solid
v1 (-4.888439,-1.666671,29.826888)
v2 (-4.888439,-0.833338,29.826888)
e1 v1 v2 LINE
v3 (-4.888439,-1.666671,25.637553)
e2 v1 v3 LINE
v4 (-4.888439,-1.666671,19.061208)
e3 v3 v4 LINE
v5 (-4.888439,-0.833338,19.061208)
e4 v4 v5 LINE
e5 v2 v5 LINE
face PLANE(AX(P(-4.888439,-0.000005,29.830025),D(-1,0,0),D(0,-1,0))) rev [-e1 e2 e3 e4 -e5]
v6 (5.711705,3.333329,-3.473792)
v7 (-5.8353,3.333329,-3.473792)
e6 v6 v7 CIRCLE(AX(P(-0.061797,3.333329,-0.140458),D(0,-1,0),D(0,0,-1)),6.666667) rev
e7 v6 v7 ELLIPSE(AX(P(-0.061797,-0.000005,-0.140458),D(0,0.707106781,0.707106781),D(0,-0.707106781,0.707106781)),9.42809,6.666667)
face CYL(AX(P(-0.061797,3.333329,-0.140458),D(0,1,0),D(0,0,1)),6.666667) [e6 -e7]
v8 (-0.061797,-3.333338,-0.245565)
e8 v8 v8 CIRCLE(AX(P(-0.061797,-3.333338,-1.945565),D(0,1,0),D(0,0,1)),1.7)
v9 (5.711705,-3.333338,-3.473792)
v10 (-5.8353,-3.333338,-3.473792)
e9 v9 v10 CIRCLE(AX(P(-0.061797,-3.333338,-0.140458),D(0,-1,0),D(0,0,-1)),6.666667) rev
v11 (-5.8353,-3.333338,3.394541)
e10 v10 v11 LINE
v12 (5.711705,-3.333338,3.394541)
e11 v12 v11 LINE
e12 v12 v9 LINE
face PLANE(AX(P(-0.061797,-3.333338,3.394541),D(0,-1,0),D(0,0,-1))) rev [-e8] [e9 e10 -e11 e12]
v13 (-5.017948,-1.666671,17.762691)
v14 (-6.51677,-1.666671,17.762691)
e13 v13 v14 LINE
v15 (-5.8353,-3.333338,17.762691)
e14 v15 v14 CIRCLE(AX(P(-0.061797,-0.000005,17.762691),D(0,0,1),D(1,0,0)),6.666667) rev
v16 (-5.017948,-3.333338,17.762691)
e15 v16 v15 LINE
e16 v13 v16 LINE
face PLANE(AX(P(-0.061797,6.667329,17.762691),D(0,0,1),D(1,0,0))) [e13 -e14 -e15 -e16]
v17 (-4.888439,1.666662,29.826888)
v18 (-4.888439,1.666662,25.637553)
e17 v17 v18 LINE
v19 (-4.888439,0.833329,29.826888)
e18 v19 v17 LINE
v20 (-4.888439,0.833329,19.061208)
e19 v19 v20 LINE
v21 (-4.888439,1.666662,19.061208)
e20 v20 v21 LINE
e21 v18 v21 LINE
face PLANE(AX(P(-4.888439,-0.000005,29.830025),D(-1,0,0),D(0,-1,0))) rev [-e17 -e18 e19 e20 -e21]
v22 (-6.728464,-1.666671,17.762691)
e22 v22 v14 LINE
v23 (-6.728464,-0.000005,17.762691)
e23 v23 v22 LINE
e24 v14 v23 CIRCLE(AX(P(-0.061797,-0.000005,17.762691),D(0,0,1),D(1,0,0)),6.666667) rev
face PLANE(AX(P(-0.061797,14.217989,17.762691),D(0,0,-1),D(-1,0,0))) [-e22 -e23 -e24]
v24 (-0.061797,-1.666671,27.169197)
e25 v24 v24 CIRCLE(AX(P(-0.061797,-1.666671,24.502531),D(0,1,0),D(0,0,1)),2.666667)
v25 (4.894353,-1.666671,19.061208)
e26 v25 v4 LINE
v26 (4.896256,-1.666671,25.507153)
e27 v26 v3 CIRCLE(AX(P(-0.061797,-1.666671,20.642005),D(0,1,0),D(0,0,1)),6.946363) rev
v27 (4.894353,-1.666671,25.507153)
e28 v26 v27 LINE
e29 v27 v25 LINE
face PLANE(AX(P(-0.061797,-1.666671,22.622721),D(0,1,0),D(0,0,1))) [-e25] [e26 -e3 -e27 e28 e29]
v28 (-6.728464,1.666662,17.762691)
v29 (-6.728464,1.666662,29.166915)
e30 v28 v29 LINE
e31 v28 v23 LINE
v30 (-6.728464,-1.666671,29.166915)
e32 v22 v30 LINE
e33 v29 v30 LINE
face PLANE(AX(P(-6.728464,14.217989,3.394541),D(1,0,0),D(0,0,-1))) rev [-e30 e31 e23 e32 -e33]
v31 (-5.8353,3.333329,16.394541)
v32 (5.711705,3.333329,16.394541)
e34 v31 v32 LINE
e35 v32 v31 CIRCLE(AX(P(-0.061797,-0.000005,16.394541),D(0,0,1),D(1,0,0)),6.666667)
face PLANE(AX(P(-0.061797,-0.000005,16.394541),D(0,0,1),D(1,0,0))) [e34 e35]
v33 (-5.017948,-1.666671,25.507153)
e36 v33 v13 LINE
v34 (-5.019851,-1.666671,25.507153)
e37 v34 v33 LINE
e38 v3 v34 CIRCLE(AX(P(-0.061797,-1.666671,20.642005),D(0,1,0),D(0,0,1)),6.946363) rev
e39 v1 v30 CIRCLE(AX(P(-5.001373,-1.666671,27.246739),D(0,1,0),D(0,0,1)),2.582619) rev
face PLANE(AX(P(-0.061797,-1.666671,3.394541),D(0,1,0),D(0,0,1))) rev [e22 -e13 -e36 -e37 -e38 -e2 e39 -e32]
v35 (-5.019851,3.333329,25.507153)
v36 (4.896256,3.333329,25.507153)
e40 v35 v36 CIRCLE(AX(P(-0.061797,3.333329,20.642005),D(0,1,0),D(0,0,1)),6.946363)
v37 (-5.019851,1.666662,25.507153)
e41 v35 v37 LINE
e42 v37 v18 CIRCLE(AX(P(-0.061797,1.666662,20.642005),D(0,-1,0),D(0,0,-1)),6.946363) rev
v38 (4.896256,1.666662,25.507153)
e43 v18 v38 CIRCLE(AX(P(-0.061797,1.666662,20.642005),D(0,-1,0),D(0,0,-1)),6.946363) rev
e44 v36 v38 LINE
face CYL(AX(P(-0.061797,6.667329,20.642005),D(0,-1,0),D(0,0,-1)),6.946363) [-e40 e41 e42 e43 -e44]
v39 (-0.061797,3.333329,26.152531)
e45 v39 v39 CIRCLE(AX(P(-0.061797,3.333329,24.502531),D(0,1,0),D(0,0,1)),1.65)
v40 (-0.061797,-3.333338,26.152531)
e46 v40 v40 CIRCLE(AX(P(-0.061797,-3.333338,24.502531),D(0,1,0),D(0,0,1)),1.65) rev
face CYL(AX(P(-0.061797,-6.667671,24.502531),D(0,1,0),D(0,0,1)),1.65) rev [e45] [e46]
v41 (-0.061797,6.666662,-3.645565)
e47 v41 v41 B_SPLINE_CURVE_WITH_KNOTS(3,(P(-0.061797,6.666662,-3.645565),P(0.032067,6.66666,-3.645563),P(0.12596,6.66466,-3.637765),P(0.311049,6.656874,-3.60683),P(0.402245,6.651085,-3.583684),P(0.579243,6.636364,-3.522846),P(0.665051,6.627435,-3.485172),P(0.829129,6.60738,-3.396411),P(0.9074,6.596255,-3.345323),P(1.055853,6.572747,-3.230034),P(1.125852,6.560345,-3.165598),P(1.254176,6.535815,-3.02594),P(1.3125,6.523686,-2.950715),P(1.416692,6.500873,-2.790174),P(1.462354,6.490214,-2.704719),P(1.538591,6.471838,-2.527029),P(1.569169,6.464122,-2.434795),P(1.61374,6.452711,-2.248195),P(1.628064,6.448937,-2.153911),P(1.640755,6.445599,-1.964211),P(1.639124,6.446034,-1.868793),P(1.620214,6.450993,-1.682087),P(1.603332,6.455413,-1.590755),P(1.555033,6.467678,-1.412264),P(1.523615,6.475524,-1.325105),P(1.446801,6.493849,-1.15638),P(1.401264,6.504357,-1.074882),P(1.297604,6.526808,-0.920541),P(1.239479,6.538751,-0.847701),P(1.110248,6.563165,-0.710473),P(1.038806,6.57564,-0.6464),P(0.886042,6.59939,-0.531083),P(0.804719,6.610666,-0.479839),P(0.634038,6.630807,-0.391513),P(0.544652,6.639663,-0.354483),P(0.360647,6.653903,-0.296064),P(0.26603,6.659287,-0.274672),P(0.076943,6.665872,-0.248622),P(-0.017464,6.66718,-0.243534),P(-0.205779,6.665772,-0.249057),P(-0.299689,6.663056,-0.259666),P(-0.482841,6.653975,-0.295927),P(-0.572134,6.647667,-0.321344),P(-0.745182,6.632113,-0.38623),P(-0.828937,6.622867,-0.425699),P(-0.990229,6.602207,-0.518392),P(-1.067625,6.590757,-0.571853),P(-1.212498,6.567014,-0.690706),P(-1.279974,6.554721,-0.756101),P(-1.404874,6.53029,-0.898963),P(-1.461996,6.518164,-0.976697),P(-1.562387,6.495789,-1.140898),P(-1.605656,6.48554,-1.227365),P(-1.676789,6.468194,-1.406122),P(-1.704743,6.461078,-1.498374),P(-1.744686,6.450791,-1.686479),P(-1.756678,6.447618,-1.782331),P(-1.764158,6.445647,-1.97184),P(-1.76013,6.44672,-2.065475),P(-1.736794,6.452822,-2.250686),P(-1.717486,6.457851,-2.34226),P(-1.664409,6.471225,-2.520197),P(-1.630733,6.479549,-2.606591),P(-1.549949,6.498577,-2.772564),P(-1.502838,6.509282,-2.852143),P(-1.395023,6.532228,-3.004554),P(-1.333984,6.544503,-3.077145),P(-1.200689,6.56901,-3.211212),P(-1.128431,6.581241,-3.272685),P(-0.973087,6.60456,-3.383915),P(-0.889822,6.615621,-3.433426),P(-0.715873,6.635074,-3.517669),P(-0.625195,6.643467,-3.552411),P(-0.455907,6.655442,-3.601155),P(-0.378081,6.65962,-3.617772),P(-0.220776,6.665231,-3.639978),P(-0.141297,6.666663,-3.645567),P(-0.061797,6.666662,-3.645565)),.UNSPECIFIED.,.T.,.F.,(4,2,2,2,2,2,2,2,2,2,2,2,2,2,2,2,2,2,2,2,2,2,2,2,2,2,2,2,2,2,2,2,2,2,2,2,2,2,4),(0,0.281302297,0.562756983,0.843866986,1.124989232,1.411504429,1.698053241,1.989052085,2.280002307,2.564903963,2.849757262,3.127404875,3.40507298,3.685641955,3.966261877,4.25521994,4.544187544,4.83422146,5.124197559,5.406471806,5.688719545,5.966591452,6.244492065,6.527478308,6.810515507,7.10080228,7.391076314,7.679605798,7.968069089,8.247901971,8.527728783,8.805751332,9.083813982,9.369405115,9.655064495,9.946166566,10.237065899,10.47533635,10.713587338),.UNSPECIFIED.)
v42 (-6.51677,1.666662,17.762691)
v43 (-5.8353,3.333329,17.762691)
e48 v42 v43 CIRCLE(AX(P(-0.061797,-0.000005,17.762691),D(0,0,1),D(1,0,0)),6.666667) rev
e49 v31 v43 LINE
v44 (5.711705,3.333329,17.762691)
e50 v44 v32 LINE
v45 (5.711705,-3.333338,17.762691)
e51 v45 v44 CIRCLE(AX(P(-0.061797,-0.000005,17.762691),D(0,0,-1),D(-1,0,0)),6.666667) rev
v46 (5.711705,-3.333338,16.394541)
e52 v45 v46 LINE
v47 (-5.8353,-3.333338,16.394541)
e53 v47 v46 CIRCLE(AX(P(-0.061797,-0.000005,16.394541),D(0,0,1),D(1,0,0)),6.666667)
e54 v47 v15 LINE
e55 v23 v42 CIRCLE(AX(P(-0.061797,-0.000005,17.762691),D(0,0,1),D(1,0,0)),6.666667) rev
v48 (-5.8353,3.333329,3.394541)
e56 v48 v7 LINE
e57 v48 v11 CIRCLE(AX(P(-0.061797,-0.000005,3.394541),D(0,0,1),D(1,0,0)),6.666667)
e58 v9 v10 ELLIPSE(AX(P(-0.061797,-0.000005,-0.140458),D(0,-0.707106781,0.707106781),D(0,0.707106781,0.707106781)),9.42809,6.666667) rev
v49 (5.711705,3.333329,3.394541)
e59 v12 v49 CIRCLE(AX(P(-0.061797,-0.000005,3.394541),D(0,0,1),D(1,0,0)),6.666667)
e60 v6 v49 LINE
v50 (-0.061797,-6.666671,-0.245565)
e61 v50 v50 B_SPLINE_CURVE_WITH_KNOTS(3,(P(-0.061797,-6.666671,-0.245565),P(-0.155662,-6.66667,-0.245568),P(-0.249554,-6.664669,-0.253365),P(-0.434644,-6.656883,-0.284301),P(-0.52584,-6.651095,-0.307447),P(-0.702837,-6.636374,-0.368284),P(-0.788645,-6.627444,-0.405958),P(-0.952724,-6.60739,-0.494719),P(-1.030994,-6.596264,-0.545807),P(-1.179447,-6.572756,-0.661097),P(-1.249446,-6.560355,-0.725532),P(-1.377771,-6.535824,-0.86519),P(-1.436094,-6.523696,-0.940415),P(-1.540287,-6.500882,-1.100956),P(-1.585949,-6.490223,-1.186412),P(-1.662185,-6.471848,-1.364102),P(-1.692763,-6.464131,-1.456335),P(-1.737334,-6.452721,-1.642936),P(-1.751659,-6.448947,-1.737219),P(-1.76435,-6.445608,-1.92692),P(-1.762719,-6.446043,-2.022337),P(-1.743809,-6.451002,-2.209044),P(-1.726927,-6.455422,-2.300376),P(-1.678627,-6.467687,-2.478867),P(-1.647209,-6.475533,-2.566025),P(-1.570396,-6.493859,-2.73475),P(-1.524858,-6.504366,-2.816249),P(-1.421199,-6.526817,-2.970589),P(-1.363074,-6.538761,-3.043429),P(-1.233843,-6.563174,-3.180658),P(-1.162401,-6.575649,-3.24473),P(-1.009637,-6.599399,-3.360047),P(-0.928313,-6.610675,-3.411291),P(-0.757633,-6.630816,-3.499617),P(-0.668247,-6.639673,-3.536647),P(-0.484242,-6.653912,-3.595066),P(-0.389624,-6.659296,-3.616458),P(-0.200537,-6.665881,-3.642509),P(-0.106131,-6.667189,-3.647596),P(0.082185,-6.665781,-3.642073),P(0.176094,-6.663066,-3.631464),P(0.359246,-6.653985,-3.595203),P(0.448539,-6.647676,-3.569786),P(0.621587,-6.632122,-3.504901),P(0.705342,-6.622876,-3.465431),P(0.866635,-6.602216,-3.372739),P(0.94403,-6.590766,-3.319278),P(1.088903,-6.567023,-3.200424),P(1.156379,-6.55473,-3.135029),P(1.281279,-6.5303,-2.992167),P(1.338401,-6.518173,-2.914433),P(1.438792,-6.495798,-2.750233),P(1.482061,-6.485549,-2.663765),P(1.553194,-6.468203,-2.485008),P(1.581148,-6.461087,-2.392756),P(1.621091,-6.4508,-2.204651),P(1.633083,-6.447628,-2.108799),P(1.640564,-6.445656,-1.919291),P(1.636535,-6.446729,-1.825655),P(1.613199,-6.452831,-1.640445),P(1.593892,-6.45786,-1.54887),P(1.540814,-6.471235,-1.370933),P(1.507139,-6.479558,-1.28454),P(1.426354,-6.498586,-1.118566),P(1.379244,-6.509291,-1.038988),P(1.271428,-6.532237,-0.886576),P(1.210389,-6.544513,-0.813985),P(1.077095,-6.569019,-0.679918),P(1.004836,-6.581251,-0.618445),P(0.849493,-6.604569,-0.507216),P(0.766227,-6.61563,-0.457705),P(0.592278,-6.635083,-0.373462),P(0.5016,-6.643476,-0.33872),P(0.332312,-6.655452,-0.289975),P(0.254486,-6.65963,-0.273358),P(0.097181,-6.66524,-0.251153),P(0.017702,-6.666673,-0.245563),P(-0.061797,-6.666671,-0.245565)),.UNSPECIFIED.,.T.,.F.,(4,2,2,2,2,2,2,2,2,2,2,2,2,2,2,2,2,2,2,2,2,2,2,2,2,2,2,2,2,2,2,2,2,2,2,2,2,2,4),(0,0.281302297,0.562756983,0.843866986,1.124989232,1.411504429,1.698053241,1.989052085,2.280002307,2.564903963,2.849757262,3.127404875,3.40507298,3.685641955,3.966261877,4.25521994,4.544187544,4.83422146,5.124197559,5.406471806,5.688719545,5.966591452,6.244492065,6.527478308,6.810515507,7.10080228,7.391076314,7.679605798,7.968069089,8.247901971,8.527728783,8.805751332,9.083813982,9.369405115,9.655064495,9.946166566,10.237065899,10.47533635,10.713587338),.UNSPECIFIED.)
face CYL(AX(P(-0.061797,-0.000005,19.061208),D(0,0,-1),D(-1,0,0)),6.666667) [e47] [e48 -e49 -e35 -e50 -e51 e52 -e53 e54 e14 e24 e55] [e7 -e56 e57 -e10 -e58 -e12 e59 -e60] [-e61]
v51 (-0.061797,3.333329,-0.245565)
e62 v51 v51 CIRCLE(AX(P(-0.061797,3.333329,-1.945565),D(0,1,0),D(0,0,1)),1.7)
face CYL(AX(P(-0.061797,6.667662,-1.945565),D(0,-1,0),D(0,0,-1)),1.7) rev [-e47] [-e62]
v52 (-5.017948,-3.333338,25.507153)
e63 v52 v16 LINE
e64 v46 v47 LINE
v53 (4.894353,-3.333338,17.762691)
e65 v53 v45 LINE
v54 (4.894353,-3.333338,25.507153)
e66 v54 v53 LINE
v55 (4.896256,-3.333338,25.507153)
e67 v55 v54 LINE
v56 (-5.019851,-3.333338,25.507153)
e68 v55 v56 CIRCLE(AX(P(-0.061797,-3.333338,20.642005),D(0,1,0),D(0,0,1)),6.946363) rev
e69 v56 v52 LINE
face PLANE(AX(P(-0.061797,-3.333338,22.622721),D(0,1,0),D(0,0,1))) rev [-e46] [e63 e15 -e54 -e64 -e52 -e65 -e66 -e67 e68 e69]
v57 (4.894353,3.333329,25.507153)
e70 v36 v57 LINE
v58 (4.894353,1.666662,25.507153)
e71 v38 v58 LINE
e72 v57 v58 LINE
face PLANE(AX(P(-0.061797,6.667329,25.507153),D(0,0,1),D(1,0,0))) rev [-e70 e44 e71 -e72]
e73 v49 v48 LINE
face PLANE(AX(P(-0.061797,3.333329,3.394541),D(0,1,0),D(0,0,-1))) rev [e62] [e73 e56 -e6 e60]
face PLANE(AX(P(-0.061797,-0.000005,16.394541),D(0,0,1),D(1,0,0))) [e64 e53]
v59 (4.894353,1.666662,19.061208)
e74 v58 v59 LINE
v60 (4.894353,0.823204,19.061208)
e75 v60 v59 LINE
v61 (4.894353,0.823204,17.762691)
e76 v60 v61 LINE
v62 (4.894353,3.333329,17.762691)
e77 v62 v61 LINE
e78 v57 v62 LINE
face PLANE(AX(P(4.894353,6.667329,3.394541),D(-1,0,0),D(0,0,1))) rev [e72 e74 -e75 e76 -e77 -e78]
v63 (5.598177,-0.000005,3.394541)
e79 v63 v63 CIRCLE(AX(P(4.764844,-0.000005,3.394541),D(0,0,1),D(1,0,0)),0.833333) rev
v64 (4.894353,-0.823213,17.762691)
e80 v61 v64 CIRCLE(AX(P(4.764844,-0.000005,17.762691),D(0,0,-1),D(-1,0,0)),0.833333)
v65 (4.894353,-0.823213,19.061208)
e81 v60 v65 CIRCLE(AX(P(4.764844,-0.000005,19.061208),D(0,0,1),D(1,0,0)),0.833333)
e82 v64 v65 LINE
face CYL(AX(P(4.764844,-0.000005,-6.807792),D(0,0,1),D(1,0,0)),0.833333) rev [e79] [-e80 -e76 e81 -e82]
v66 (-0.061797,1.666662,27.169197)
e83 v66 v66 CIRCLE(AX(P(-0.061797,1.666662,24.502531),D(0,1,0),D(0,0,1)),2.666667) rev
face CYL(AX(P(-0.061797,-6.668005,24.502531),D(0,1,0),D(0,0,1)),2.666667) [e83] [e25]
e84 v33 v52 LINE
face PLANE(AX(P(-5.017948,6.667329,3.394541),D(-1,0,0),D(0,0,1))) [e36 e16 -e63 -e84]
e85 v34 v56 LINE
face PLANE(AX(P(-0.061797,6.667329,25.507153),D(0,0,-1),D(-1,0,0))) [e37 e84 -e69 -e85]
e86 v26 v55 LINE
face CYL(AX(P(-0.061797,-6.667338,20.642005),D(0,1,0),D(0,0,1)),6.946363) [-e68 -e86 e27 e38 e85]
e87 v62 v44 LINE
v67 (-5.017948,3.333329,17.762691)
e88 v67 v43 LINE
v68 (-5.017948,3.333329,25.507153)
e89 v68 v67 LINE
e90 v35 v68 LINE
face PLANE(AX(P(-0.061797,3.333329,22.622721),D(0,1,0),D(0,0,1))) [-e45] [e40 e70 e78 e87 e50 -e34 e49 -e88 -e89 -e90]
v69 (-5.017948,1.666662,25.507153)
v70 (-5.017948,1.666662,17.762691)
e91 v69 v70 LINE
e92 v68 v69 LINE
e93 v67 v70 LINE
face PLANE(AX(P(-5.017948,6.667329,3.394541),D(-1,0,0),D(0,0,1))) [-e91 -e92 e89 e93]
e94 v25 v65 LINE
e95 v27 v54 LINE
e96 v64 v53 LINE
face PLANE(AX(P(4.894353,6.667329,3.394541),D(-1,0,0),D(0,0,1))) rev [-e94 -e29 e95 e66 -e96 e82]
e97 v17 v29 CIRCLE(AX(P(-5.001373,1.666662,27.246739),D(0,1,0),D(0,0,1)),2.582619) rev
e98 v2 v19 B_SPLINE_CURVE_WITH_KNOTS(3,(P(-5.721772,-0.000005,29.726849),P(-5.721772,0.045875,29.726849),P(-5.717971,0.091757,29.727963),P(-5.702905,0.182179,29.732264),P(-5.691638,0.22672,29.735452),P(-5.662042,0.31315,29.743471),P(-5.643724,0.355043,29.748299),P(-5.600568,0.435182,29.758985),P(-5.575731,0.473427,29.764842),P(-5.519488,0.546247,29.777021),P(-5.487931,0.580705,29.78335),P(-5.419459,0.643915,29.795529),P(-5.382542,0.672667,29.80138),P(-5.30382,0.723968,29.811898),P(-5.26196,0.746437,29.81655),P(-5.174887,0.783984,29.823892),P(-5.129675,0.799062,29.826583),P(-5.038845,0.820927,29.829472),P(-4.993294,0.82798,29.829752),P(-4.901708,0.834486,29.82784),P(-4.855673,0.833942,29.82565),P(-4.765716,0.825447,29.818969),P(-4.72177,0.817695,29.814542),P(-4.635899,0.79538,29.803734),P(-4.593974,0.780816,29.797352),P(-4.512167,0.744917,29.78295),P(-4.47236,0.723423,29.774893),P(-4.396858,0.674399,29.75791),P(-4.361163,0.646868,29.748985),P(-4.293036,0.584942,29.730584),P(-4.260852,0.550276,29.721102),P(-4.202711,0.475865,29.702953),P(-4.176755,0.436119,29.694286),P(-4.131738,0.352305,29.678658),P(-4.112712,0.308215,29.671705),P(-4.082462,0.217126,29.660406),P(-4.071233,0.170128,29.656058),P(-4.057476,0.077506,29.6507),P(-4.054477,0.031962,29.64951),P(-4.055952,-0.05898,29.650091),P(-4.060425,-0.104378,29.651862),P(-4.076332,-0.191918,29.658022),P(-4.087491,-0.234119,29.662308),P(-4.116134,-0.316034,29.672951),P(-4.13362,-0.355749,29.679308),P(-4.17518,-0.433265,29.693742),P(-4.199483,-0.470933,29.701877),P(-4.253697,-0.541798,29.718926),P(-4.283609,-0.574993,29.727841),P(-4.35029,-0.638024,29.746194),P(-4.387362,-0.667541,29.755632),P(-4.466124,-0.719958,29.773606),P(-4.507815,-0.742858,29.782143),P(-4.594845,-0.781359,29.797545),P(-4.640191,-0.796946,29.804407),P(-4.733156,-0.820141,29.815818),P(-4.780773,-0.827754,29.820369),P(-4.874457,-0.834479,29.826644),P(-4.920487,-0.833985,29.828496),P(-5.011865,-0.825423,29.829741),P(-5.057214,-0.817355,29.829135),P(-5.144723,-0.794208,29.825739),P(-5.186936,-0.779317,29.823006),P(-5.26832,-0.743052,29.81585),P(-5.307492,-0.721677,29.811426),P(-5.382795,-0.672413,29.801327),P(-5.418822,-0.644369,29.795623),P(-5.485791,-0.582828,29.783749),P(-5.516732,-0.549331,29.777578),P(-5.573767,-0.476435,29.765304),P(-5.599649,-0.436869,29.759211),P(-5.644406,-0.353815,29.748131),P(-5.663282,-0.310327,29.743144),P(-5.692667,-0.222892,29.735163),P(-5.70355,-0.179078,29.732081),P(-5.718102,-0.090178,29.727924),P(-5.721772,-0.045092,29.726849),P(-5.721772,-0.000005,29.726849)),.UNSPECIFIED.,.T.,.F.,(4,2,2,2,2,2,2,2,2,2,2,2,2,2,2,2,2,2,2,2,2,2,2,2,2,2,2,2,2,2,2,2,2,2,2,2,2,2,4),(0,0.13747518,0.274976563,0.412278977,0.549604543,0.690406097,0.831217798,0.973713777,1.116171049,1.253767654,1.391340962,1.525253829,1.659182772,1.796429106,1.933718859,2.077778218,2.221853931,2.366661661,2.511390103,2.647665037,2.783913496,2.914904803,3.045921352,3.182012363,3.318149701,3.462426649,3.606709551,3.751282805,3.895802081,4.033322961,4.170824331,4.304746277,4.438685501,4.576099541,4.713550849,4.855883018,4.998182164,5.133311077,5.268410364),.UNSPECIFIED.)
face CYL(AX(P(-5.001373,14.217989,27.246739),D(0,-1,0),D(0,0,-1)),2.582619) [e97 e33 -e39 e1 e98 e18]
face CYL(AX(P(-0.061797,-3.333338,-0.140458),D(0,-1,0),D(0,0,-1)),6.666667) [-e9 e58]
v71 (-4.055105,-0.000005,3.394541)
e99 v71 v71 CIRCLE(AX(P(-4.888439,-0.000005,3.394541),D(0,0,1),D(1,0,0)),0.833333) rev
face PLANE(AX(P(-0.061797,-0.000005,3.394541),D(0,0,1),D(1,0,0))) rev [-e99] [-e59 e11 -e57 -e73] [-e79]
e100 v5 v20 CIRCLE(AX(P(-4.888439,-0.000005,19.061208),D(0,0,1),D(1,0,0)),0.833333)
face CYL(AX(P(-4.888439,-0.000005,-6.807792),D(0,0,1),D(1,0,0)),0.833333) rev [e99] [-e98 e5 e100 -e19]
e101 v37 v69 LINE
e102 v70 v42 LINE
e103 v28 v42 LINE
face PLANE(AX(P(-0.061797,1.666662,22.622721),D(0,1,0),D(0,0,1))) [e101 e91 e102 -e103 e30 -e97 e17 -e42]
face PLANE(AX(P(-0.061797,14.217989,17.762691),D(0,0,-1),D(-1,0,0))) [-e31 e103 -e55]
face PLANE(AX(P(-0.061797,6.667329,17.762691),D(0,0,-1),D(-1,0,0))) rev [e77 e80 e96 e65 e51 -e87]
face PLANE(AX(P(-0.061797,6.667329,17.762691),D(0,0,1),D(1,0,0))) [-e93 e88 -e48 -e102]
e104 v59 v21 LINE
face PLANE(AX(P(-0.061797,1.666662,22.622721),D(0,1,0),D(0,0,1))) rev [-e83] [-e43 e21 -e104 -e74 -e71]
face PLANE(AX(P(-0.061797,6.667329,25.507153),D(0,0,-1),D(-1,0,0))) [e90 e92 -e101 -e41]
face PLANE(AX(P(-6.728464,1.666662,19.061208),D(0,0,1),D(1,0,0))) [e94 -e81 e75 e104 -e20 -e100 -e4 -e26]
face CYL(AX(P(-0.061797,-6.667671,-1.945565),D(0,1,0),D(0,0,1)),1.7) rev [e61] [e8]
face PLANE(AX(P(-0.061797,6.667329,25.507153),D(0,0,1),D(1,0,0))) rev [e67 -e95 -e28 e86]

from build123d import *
from build123d.topology import SkipClean

# Parameters (mm, degrees)
SKETCH2_R                       = 10
PHALANGE_LENGTH_DEPTH           = 23.5
BOSS_EXTRUDE3_DEPTH             = 5
BOSS_EXTRUDE4_DEPTH             = 5
BOSS_EXTRUDE4_DEPTH_BACK        = 5
CUT_EXTRUDE2_START              = -15.3025
CUT_EXTRUDE2_DEPTH              = 15.3025
SKETCH7_R                       = 1.65
CUT_EXTRUDE3_DEPTH              = 10
CUT_EXTRUDE4_DEPTH              = 2.5
CUT_EXTRUDE4_DEPTH_BACK         = 2.5
CUT_EXTRUDE7_REACH              = 44.831
SKETCH4_R                       = 1.65
CUT_EXTRUDE7_DIRECTION_2_REACH  = 44.831
CUT_EXTRUDE_THIN1_START         = 23.5
CUT_EXTRUDE_THIN1_DEPTH         = 10.361670454
BOSS_EXTRUDE5_REACH             = 44.021
SKETCH9_R                       = 4
SKETCH9_R_2                     = 1.65
CUT_EXTRUDE8_REACH              = 43.299
SKETCH10_R                      = 1.25
CUT_EXTRUDE9_START              = -4
CUT_EXTRUDE9_DEPTH              = 4
CUT_EXTRUDE10_REACH             = 44.021
CUT_EXTRUDE10_DIRECTION_2_REACH = 44.021
CUT_EXTRUDE11_START             = -10
CUT_EXTRUDE11_OUTLINE_W         = 2.565773848
CUT_EXTRUDE11_OUTLINE_H         = 11.6166929
CUT_EXTRUDE11_DEPTH             = 10
BOSS_EXTRUDE7_REACH             = 41.664
CUT_EXTRUDE12_REACH             = 43.299
SKETCH10_2_R                    = 1.25
CUT_EXTRUDE12_DIRECTION_2_REACH = 43.299
SKETCH17_R                      = 1.25
SKETCH17_W                      = 2.42123439
SKETCH17_H                      = 5
CUT_EXTRUDE14_DEPTH             = 16.148519
SCALE1_SCALE                    = 0.666666667
CUT_EXTRUDE15_START             = -10
SKETCH18_R                      = 1.65
CUT_EXTRUDE15_DEPTH             = 13.333338
CUT_EXTRUDE16_START             = -3.333333
SKETCH19_R                      = 1.7
CUT_EXTRUDE16_DEPTH             = 13.333338


# Read off the part's stored shape, not the designer's step: Cut-Extrude-Thin1, Cut-Extrude11
with BuildPart() as part:
    # Sketch2 → Phalange Length (new body)
    with BuildSketch(Plane.XY):
        Circle(SKETCH2_R)
    extrude(amount=PHALANGE_LENGTH_DEPTH)

    # Sketch3 → Boss-Extrude3 (add)
    with BuildSketch(Plane(origin=(0, -10, 0), x_dir=(-1, 0, 0), z_dir=(0, -1, 0))):
        with BuildLine():
            Line((-10, 5.302499701), (-10, 0))
            Line((-10, 0), (10, 0))
            Line((10, 0), (10, 5.302499701))
            ThreePointArc((10, 5.302499701), (0, 15.302499701), (-10, 5.302499701))
        make_face()
    boss_extrude3 = extrude(amount=-BOSS_EXTRUDE3_DEPTH)

    # Mirror1: Boss-Extrude3 across plane
    add(boss_extrude3.mirror(Plane.ZX))

    # Sketch5 → Boss-Extrude4 (add, two sides: drawn at the far end of the back side and taken through both)
    with BuildSketch(Plane(origin=(0, 0, 0), x_dir=(1, 0, 0), z_dir=(0, 1, 0)).offset(-BOSS_EXTRUDE4_DEPTH_BACK)):
        with BuildLine():
            Line((-10, -29.283157911), (-10, -23.5))
            Line((-10, -23.5), (10, -23.5))
            Line((10, -23.5), (10, -29.283157911))
            ThreePointArc((10, -29.283157911), (0, -38.851984156), (-10, -29.283157911))
        make_face()
    extrude(amount=BOSS_EXTRUDE4_DEPTH + BOSS_EXTRUDE4_DEPTH_BACK)

    # Sketch6 → Cut-Extrude2 (cut)
    with SkipClean():  # the faces are left unmerged after this step: merging them gives an invalid solid
        with BuildSketch(Plane.XY.offset(CUT_EXTRUDE2_START)):
            with BuildLine():
                ThreePointArc((0, 10), (5, 8.660254038), (8.660254038, 5))
                Line((8.660254038, 5), (10, 5))
                Line((10, 5), (10, 10))
                Line((10, 10), (0, 10))
            make_face()
            with BuildLine():
                Line((10, -5), (8.660254038, -5))
                ThreePointArc((8.660254038, -5), (5, -8.660254038), (0, -10))
                Line((0, -10), (10, -10))
                Line((10, -10), (10, -5))
            make_face()
            with BuildLine():
                ThreePointArc((-8.660254038, 5), (-5, 8.660254038), (0, 10))
                Line((0, 10), (-10, 10))
                Line((-10, 10), (-10, 5))
                Line((-10, 5), (-8.660254038, 5))
            make_face()
            with BuildLine():
                Line((-10, -10), (0, -10))
                ThreePointArc((0, -10), (-5, -8.660254038), (-8.660254038, -5))
                Line((-8.660254038, -5), (-10, -5))
                Line((-10, -5), (-10, -10))
            make_face()
        extrude(amount=CUT_EXTRUDE2_DEPTH, mode=Mode.SUBTRACT)

    # Sketch7 → Cut-Extrude3 (cut)
    with SkipClean():  # the faces are left unmerged after this step: merging them gives an invalid solid
        with BuildSketch(Plane(origin=(0, 5, 0), x_dir=(1, 0, 0), z_dir=(0, 1, 0))):
            with Locations(Location((0, -31.661984156, 0), (0, 0, 270))):
                Circle(SKETCH7_R)
        extrude(amount=-CUT_EXTRUDE3_DEPTH, mode=Mode.SUBTRACT)

    # Sketch5<2> → Cut-Extrude4 (cut, two sides: drawn at the far end of the back side and taken through both)
    with BuildSketch(Plane(origin=(0, 0, 0), x_dir=(1, 0, 0), z_dir=(0, 1, 0)).offset(-CUT_EXTRUDE4_DEPTH_BACK)):
        with BuildLine():
            Line((-10, -29.283157911), (-10, -23.5))
            Line((-10, -23.5), (10, -23.5))
            Line((10, -23.5), (10, -29.283157911))
            ThreePointArc((10, -29.283157911), (0, -38.851984156), (-10, -29.283157911))
        make_face()
    extrude(amount=CUT_EXTRUDE4_DEPTH + CUT_EXTRUDE4_DEPTH_BACK, mode=Mode.SUBTRACT)

    # Sketch4 → Cut-Extrude7 (cut, up to next)
    with BuildSketch(Plane(origin=(0, -5, 0), x_dir=(1, 0, 0), z_dir=(0, 1, 0)), mode=Mode.PRIVATE) as cut_extrude7_sk1:
        with Locations(Location((0, 8.010159673, 0), (0, 0, 270))):
            Circle(SKETCH4_R)
    cut_extrude7_tool1 = extrude(cut_extrude7_sk1.sketch, amount=-CUT_EXTRUDE7_REACH, mode=Mode.PRIVATE) & part.part
    add(cut_extrude7_tool1.solids().sort_by_distance((0, -5, -8.01016))[0], mode=Mode.SUBTRACT)

    # Sketch4 → Cut-Extrude7 direction 2 (cut, up to next)
    with BuildSketch(Plane(origin=(0, -5, 0), x_dir=(1, 0, 0), z_dir=(0, 1, 0)), mode=Mode.PRIVATE) as cut_extrude7_direction_2_sk1:
        with Locations(Location((0, 8.010159673, 0), (0, 0, 270))):
            Circle(SKETCH4_R)
    cut_extrude7_direction_2_tool1 = extrude(cut_extrude7_direction_2_sk1.sketch, amount=CUT_EXTRUDE7_DIRECTION_2_REACH, mode=Mode.PRIVATE) & part.part
    add(cut_extrude7_direction_2_tool1.solids().sort_by_distance((0, -5, -8.01016))[0], mode=Mode.SUBTRACT)

    # Cut-Extrude-Thin1 outline → Cut-Extrude-Thin1 (cut)
    with SkipClean():  # the faces are left unmerged after this step: merging them gives an invalid solid
        with BuildSketch(Plane.XY.offset(CUT_EXTRUDE_THIN1_START)):
            with BuildLine():
                ThreePointArc((8.660254038, 5), (9.256147934, 3.78466979), (9.682458366, 2.5))
                Line((9.682458366, 2.5), (10, 2.5))
                Line((10, 2.5), (10, 5))
                Line((10, 5), (8.660254038, 5))
            make_face()
            with BuildLine():
                Line((10, -2.5), (9.682458366, -2.5))
                ThreePointArc((9.682458366, -2.5), (9.256147934, -3.78466979), (8.660254038, -5))
                Line((8.660254038, -5), (10, -5))
                Line((10, -5), (10, -2.5))
            make_face()
            with BuildLine():
                Line((-10, 2.5), (-9.682458366, 2.5))
                ThreePointArc((-9.682458366, 2.5), (-9.256147934, 3.78466979), (-8.660254038, 5))
                Line((-8.660254038, 5), (-10, 5))
                Line((-10, 5), (-10, 2.5))
            make_face()
            with BuildLine():
                ThreePointArc((-8.660254038, -5), (-9.256147934, -3.78466979), (-9.682458366, -2.5))
                Line((-9.682458366, -2.5), (-10, -2.5))
                Line((-10, -2.5), (-10, -5))
                Line((-10, -5), (-8.660254038, -5))
            make_face()
        extrude(amount=CUT_EXTRUDE_THIN1_DEPTH, mode=Mode.SUBTRACT)

    # Sketch9 → Boss-Extrude5 (add, up to next)
    with BuildSketch(Plane.XZ.offset(-2.5), mode=Mode.PRIVATE) as boss_extrude5_sk1:
        with Locations(Location((0, 31.661984156, 0), (0, 0, 90))):
            Circle(SKETCH9_R)
        with Locations(Location((0, 31.661984156, 0), (0, 0, 90))):
            Circle(SKETCH9_R_2, mode=Mode.SUBTRACT)
    boss_extrude5_tool1 = extrude(boss_extrude5_sk1.sketch, amount=BOSS_EXTRUDE5_REACH, mode=Mode.PRIVATE) - part.part
    add(boss_extrude5_tool1.solids().sort_by_distance((0, 2.5, 27.775121))[0])

    # Sketch10 → Cut-Extrude8 (cut, up to next)
    with BuildSketch(Plane.XY.offset(23.5), mode=Mode.PRIVATE) as cut_extrude8_sk1:
        with Locations((7.239961745, 0)):
            Circle(SKETCH10_R)
    cut_extrude8_tool1 = extrude(cut_extrude8_sk1.sketch, amount=-CUT_EXTRUDE8_REACH, mode=Mode.PRIVATE) & part.part
    # Sketch10 → Cut-Extrude8 (cut, up to next)
    with BuildSketch(Plane.XY.offset(23.5), mode=Mode.PRIVATE) as cut_extrude8_sk2:
        with Locations((-7.239961745, 0)):
            Circle(SKETCH10_R)
    cut_extrude8_tool2 = extrude(cut_extrude8_sk2.sketch, amount=-CUT_EXTRUDE8_REACH, mode=Mode.PRIVATE) & part.part
    add(cut_extrude8_tool1.solids().sort_by_distance((7.239962, 0, 23.5))[0], mode=Mode.SUBTRACT)
    add(cut_extrude8_tool2.solids().sort_by_distance((-7.239962, 0, 23.5))[0], mode=Mode.SUBTRACT)

    # Sketch11 → Cut-Extrude9 (cut)
    with SkipClean():  # the faces are left unmerged after this step: merging them gives an invalid solid
        with BuildSketch(Plane.XY.offset(23.5).offset(CUT_EXTRUDE9_START)):
            with BuildLine():
                ThreePointArc((8.660254038, 5), (0, 10), (-8.660254038, 5))
                Line((-8.660254038, 5), (8.660254038, 5))
            make_face()
            with BuildLine():
                Line((8.660254038, -5), (-8.660254038, -5))
                ThreePointArc((-8.660254038, -5), (0, -10), (8.660254038, -5))
            make_face()
        extrude(amount=CUT_EXTRUDE9_DEPTH, mode=Mode.SUBTRACT)

    # Sketch12 → Cut-Extrude10 (cut, up to next)
    with BuildSketch(Plane.XZ.offset(-2.5), mode=Mode.PRIVATE) as cut_extrude10_sk1:
        with BuildLine():
            Line((-10.033719202, 38.851984156), (-10.033719202, 31.664892021))
            Line((-10.033719202, 31.664892021), (-8.660254038, 31.664892021))
            ThreePointArc((-8.660254038, 31.664892021), (0, 36.290740593), (8.660254038, 31.664892021))
            Line((8.660254038, 31.664892021), (10.033719202, 31.664892021))
            Line((10.033719202, 31.664892021), (10.033719202, 38.851984156))
            Line((10.033719202, 38.851984156), (-10.033719202, 38.851984156))
        make_face()
    cut_extrude10_tool1 = extrude(cut_extrude10_sk1.sketch, amount=CUT_EXTRUDE10_REACH, mode=Mode.PRIVATE) & part.part
    add(cut_extrude10_tool1.solids().sort_by_distance((0, 2.5, 36.350279))[0], mode=Mode.SUBTRACT)

    # Sketch12 → Cut-Extrude10 direction 2 (cut, up to next)
    with BuildSketch(Plane.XZ.offset(-2.5), mode=Mode.PRIVATE) as cut_extrude10_direction_2_sk1:
        with BuildLine():
            Line((-10.033719202, 38.851984156), (-10.033719202, 31.664892021))
            Line((-10.033719202, 31.664892021), (-8.660254038, 31.664892021))
            ThreePointArc((-8.660254038, 31.664892021), (0, 36.290740593), (8.660254038, 31.664892021))
            Line((8.660254038, 31.664892021), (10.033719202, 31.664892021))
            Line((10.033719202, 31.664892021), (10.033719202, 38.851984156))
            Line((10.033719202, 38.851984156), (-10.033719202, 38.851984156))
        make_face()
    cut_extrude10_direction_2_tool1 = extrude(cut_extrude10_direction_2_sk1.sketch, amount=-CUT_EXTRUDE10_DIRECTION_2_REACH, mode=Mode.PRIVATE) & part.part
    add(cut_extrude10_direction_2_tool1.solids().sort_by_distance((0, 2.5, 36.350279))[0], mode=Mode.SUBTRACT)

    # Cut-Extrude11 outline → Cut-Extrude11 (cut)
    with BuildSketch(Plane.XZ.offset(5).offset(CUT_EXTRUDE11_START)):
        with Locations((-8.717113076, 27.360571369)):
            Rectangle(CUT_EXTRUDE11_OUTLINE_W, CUT_EXTRUDE11_OUTLINE_H)
        with Locations((8.717113076, 27.360571369)):
            Rectangle(CUT_EXTRUDE11_OUTLINE_W, CUT_EXTRUDE11_OUTLINE_H)
    extrude(amount=CUT_EXTRUDE11_DEPTH, mode=Mode.SUBTRACT)

    # Boss-Extrude7: up to this face of the body (flat: up to its plane)
    boss_extrude7_end = Plane(part.part.faces().sort_by_distance((0, 2.5, 23.696174341))[0])
    # Sketch16 → Boss-Extrude7 (add, up to the picked face)
    with BuildSketch(Plane(origin=(0, -2.5, 0), x_dir=(1, 0, 0), z_dir=(0, 1, 0)), mode=Mode.PRIVATE) as boss_extrude7_sk1:
        with BuildLine():
            Line((-4.818727355, -21.552224919), (-7.434226152, -21.552224919))
            Line((-7.434226152, -21.552224919), (-10, -21.552224919))
            Line((-10, -21.552224919), (-10, -38.658561033))
            ThreePointArc((-10, -38.658561033), (-8.808295471, -39.390817912), (-7.43422564, -39.652145139))
            ThreePointArc((-7.43422564, -39.652145139), (-6.033645007, -39.399721533), (-4.818727355, -38.658561033))
            Line((-4.818727355, -38.658561033), (-4.818727355, -35.109527951))
            ThreePointArc((-4.818727355, -35.109527951), (-6.204248493, -34.242230104), (-7.437080645, -33.168917819))
            Line((-7.437080645, -33.168917819), (-7.434226152, -33.168917819))
            Line((-7.434226152, -33.168917819), (-7.434226152, -23.5))
            Line((-7.434226152, -23.5), (-4.818727355, -23.5))
            Line((-4.818727355, -23.5), (-4.818727355, -21.552224919))
        make_face()
    boss_extrude7_tool1 = split(extrude(boss_extrude7_sk1.sketch, amount=BOSS_EXTRUDE7_REACH, mode=Mode.PRIVATE), bisect_by=boss_extrude7_end, keep=Keep.BOTH, mode=Mode.PRIVATE)
    # Sketch16 → Boss-Extrude7 (add, up to the picked face)
    with BuildSketch(Plane(origin=(0, -2.5, 0), x_dir=(1, 0, 0), z_dir=(0, 1, 0)), mode=Mode.PRIVATE) as boss_extrude7_sk2:
        with BuildLine():
            Line((-4.818727355, -35.109527951), (-4.818727355, -23.5))
            Line((-4.818727355, -23.5), (-7.434226152, -23.5))
            Line((-7.434226152, -23.5), (-7.434226152, -33.168917819))
            Line((-7.434226152, -33.168917819), (-7.437080645, -33.168917819))
            ThreePointArc((-7.437080645, -33.168917819), (-6.204248493, -34.242230104), (-4.818727355, -35.109527951))
        make_face()
    boss_extrude7_tool2 = split(extrude(boss_extrude7_sk2.sketch, amount=BOSS_EXTRUDE7_REACH, mode=Mode.PRIVATE), bisect_by=boss_extrude7_end, keep=Keep.BOTH, mode=Mode.PRIVATE)
    add(boss_extrude7_tool1.solids().sort_by(Axis((-7.989429, -2.5, 31.133344), (0, 1, 0)))[0])
    add(boss_extrude7_tool2.solids().sort_by(Axis((-6.08748, -2.5, 28.8879), (0, 1, 0)))[0])

    # Sketch10<2> → Cut-Extrude12 (cut, up to next)
    with BuildSketch(Plane.XY.offset(23.5), mode=Mode.PRIVATE) as cut_extrude12_sk1:
        with Locations((-7.239961745, 0)):
            Circle(SKETCH10_2_R)
    cut_extrude12_tool1 = extrude(cut_extrude12_sk1.sketch, amount=CUT_EXTRUDE12_REACH, mode=Mode.PRIVATE) & part.part
    add(cut_extrude12_tool1.solids().sort_by_distance((-7.239962, 0, 23.5))[0], mode=Mode.SUBTRACT)

    # Sketch10<2> → Cut-Extrude12 direction 2 (cut, up to next)
    with BuildSketch(Plane.XY.offset(23.5), mode=Mode.PRIVATE) as cut_extrude12_direction_2_sk1:
        with Locations((-7.239961745, 0)):
            Circle(SKETCH10_2_R)
    cut_extrude12_direction_2_tool1 = extrude(cut_extrude12_direction_2_sk1.sketch, amount=-CUT_EXTRUDE12_DIRECTION_2_REACH, mode=Mode.PRIVATE) & part.part
    add(cut_extrude12_direction_2_tool1.solids().sort_by_distance((-7.239962, 0, 23.5))[0], mode=Mode.SUBTRACT)

    # Sketch17 → Cut-Extrude14 (cut)
    with SkipClean():  # the faces are left unmerged after this step: merging them gives an invalid solid
        with BuildSketch(Plane.XY.offset(23.5)):
            with Locations((-7.239961745, 0)):
                Circle(SKETCH17_R)
            with Locations((-6.02934455, 0)):
                Rectangle(SKETCH17_W, SKETCH17_H)
        extrude(amount=CUT_EXTRUDE14_DEPTH, mode=Mode.SUBTRACT)


with BuildPart() as part_1:
    # Scale1: scaled about (-0.185364754, -1.7e-07, 10.183125928)
    add(part.part.scale(SCALE1_SCALE).moved(Location((-0.061788251, -5.7e-08, 3.394375309))))

    # Sketch18 → Cut-Extrude15 (cut)
    with BuildSketch(Plane(origin=(0, 3.333328693, 0), x_dir=(1, 0, 0), z_dir=(0, 1, 0)).offset(CUT_EXTRUDE15_START)):
        with Locations(Location((-0.061797352, -24.502530762, 0), (0, 0, 270))):
            Circle(SKETCH18_R)
    extrude(amount=CUT_EXTRUDE15_DEPTH, mode=Mode.SUBTRACT)

    # Sketch19 → Cut-Extrude16 (cut)
    with BuildSketch(Plane(origin=(0, -3.333337974, 0), x_dir=(1, 0, 0), z_dir=(0, 1, 0)).offset(CUT_EXTRUDE16_START)):
        with Locations(Location((-0.061797352, 1.945565124, 0), (0, 0, 90))):
            Circle(SKETCH19_R)
    extrude(amount=CUT_EXTRUDE16_DEPTH, mode=Mode.SUBTRACT)


solid = part_1.part
